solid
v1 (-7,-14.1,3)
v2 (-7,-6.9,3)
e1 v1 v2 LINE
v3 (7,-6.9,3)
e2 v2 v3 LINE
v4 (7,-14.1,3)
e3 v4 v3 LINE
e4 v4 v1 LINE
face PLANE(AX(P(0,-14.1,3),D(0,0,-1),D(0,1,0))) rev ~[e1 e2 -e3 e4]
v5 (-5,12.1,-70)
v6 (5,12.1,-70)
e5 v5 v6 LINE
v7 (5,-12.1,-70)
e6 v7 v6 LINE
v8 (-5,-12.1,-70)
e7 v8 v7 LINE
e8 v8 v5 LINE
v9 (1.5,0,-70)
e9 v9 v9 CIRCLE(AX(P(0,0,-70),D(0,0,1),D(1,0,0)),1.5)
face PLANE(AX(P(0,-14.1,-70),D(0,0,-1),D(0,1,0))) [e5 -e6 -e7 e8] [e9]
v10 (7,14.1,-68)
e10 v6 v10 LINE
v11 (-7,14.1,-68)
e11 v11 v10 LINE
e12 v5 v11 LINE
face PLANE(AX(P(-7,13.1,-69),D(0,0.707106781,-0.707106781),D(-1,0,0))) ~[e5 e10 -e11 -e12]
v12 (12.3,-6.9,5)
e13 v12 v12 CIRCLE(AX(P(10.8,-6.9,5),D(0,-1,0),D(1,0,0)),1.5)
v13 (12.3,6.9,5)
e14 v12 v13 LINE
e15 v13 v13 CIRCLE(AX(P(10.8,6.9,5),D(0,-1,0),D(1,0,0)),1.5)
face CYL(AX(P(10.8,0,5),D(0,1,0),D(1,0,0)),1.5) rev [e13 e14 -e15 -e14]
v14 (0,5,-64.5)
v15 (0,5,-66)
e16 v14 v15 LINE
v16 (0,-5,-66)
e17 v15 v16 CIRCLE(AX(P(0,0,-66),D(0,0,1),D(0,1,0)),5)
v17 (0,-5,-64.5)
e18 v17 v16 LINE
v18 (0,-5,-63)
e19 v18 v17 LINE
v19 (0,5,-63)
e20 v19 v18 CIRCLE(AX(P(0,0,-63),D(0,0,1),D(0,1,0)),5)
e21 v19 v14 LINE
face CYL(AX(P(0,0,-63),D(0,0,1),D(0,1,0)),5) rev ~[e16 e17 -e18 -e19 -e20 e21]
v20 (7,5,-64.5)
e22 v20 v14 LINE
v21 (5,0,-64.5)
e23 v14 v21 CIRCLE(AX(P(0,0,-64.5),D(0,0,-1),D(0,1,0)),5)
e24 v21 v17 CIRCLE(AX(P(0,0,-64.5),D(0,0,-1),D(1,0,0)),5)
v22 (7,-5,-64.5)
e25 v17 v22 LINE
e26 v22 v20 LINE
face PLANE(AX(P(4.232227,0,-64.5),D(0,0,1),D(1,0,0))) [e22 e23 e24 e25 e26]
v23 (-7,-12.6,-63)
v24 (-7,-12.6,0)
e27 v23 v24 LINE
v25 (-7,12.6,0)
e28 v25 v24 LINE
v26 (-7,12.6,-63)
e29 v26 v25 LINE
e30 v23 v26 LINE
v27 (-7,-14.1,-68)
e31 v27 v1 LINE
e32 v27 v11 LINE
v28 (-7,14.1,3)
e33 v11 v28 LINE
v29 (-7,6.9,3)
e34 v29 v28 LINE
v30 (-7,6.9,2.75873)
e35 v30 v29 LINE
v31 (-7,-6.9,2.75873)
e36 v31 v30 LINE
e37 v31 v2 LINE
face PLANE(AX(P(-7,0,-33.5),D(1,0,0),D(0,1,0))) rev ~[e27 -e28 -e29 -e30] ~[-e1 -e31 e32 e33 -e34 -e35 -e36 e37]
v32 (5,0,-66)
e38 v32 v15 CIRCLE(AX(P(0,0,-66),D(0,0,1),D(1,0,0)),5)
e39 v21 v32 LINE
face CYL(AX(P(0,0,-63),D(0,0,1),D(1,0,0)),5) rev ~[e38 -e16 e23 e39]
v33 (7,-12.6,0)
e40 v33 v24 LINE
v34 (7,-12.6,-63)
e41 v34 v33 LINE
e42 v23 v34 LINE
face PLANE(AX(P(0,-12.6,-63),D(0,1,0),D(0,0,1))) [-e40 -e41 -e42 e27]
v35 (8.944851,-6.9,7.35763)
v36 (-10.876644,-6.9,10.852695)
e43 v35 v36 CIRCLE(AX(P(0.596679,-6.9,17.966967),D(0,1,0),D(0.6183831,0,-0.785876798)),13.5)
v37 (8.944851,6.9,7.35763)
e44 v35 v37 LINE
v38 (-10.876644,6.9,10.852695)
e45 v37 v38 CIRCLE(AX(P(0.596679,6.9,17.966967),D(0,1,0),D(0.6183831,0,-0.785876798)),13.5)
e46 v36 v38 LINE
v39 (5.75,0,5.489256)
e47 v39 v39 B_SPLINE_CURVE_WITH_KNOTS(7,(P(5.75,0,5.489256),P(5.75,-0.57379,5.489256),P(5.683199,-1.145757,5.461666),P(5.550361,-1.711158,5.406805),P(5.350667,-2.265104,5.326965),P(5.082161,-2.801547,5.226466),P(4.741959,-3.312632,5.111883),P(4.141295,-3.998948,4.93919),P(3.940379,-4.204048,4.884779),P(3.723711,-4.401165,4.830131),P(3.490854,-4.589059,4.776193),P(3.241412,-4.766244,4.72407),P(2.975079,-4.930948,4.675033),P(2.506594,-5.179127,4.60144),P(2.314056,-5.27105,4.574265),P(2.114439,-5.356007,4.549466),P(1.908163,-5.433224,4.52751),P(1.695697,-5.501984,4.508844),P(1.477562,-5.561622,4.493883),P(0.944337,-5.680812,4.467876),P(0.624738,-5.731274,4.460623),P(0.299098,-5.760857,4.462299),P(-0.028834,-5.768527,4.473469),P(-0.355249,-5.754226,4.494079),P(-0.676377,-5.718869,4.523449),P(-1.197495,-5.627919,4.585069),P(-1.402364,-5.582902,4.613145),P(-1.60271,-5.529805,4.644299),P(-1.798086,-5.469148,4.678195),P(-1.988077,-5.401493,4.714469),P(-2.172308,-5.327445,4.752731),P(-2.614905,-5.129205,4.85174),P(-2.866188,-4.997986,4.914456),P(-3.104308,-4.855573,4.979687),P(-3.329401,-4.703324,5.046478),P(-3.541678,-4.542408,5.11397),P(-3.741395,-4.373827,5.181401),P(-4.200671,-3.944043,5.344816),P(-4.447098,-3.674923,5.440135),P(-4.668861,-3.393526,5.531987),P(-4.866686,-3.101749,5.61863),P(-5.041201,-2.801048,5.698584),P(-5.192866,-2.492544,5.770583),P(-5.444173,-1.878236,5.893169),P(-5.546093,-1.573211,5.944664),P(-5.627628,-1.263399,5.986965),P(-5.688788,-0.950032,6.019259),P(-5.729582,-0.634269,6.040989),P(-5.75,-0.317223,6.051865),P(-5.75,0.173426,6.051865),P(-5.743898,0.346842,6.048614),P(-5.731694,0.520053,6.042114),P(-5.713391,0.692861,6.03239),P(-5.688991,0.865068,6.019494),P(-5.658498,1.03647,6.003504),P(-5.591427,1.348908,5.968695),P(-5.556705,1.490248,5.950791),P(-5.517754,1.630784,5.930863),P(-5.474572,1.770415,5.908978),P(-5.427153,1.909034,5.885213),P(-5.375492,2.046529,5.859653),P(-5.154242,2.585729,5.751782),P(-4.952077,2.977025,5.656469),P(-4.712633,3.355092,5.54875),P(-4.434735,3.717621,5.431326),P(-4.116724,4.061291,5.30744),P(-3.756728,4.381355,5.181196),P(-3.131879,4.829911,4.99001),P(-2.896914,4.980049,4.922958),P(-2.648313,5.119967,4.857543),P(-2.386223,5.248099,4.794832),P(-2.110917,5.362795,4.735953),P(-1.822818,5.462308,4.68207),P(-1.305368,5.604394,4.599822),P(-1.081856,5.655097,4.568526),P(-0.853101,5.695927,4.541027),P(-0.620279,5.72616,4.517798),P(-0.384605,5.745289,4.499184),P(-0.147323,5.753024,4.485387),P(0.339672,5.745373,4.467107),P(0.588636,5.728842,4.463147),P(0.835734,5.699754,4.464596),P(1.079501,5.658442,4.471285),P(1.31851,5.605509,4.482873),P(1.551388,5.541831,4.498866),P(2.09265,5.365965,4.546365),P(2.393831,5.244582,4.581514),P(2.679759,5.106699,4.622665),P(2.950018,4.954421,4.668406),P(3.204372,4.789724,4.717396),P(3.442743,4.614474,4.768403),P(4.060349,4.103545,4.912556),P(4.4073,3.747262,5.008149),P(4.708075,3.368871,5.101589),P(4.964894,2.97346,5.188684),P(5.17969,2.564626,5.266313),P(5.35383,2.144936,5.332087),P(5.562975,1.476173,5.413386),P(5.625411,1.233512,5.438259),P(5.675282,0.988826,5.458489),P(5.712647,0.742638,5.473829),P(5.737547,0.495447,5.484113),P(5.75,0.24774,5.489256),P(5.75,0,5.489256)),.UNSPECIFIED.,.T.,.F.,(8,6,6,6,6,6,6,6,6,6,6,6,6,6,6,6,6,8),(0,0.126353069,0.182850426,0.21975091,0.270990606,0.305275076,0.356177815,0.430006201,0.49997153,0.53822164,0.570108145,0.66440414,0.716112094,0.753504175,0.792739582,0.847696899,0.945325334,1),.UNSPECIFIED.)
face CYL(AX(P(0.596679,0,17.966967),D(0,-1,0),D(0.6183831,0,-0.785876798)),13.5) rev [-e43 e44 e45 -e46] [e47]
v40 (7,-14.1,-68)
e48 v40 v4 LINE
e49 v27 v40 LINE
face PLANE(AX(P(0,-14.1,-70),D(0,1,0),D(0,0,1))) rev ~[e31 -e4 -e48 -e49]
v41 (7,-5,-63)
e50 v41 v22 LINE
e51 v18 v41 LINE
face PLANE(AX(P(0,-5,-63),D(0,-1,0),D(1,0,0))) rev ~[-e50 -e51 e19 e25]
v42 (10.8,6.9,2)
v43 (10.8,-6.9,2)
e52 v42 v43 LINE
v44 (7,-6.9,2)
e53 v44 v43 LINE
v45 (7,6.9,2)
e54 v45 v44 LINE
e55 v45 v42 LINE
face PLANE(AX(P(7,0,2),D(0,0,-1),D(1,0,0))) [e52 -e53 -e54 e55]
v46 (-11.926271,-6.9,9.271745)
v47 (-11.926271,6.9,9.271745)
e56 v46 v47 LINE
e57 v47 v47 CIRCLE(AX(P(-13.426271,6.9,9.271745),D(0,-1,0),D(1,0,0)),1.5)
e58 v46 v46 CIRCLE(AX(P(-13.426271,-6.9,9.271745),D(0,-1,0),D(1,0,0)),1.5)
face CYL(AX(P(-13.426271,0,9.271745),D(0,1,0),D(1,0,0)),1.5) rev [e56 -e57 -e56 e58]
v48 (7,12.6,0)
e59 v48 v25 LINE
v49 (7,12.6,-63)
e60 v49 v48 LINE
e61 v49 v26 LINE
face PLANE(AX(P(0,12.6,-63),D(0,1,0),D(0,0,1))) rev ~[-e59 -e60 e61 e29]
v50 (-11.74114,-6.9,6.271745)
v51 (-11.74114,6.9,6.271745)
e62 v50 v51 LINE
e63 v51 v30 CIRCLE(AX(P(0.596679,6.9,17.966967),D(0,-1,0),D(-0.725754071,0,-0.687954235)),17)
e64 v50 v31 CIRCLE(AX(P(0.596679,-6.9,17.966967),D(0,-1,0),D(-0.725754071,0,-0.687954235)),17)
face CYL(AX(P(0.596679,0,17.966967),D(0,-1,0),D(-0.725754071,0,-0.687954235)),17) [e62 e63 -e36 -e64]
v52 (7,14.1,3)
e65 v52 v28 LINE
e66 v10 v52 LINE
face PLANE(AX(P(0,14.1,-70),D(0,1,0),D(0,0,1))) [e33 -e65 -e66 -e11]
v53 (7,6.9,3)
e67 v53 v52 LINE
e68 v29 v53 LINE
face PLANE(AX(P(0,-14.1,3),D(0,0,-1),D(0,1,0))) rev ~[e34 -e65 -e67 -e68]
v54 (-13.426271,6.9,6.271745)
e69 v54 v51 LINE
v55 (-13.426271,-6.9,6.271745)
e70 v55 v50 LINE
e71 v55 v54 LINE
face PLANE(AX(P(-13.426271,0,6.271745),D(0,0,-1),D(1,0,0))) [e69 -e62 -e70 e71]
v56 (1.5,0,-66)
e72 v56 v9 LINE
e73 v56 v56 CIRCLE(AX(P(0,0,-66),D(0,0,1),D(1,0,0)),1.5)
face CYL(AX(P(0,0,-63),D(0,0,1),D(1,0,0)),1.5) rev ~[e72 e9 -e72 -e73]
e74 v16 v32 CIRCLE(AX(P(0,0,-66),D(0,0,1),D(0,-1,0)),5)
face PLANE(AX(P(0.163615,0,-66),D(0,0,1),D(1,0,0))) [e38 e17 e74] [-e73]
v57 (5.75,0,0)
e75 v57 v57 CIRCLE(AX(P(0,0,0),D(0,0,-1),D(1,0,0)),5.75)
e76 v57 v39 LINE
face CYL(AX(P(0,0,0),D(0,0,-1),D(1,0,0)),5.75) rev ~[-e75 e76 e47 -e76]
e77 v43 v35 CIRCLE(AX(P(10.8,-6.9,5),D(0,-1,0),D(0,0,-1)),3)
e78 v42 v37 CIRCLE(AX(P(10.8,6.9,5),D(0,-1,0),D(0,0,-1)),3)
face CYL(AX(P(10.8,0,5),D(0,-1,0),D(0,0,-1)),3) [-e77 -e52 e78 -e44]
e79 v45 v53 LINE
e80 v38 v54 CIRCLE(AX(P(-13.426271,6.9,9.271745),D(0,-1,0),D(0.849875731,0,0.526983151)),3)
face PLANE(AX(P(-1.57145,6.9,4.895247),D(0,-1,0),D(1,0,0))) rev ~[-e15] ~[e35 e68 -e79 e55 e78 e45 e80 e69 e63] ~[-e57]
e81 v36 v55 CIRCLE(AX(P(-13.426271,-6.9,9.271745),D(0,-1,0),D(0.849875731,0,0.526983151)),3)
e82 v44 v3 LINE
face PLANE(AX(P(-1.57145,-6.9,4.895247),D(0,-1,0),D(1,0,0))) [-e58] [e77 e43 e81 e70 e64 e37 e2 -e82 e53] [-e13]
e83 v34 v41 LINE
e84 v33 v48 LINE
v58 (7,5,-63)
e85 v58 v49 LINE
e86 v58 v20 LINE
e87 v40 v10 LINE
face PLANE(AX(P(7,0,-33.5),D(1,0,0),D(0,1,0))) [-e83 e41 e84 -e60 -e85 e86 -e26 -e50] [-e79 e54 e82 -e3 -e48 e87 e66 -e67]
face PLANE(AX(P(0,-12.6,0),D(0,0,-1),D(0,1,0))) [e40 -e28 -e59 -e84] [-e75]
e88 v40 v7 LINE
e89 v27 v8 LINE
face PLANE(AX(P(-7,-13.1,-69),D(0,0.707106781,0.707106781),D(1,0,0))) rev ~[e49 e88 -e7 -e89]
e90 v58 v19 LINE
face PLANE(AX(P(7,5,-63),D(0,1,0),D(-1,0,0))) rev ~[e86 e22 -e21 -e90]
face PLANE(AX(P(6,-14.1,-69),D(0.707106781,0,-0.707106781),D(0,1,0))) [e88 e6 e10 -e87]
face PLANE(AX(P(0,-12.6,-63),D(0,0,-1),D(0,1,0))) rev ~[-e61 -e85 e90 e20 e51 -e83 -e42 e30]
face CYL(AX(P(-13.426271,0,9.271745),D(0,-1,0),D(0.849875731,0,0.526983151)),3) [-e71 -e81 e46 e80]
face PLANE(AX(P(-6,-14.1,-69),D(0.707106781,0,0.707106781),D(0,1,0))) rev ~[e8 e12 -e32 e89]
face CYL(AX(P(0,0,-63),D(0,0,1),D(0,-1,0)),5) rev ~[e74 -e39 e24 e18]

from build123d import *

# Parameters (mm, degrees)
F0_R      = 1.5
F1_DEPTH  = 6.9
F2_W      = 28.2
F2_H      = 73
F2_W_2    = 25.2
F2_H_2    = 63
F3_DEPTH  = 7
F4_R      = 5.75
F5_DEPTH  = 12.2727451706
F6_SIZE   = 2
F7_R      = 1.5
F8_DEPTH  = 3
F9_DEPTH  = 7.001
F10_DEPTH = 1.5


with BuildPart() as f1:
    # F0 (on Front) → F1 (new body, symmetric)
    with BuildSketch(Plane.XZ):
        with BuildLine():
            Line((-7, 2.7587302293), (-7, 0))
            Line((-7, 0), (7, 0))
            Line((7, 0), (7, 2))
            Line((7, 2), (10.8, 2))
            ThreePointArc((10.8, 2), (13.6348625345, 5.9816080739), (8.9448506986, 7.3576303929))
            ThreePointArc((8.9448506986, 7.3576303929), (-1.7475715563, 4.6720624952), (-10.8766435302, 10.8526946234))
            ThreePointArc((-10.8766435302, 10.8526946234), (-16.0476108736, 10.7307091252), (-13.4262707241, 6.2717451706))
            Line((-13.4262707241, 6.2717451706), (-11.7411403572, 6.2717451706))
            ThreePointArc((-11.7411403572, 6.2717451706), (-9.5241596378, 4.3079544417), (-7, 2.7587302293))
        make_face()
        with Locations((10.8, 5)):
            Circle(F0_R, mode=Mode.SUBTRACT)
        with Locations((-13.4262707241, 9.2717451706)):
            Circle(F0_R, mode=Mode.SUBTRACT)
    extrude(amount=F1_DEPTH, both=True)

    # F2 (on Right) → F3 (join, symmetric)
    with BuildSketch(Plane.YZ):
        with Locations((0, -33.5)):
            Rectangle(F2_W, F2_H)
        with Locations((0, -31.5)):
            Rectangle(F2_W_2, F2_H_2, mode=Mode.SUBTRACT)
    extrude(amount=F3_DEPTH, both=True)

    # F4 (on face) → F5 (cut, through all)
    with BuildSketch(Plane(origin=(0, 0, 0), x_dir=(1, 0, 0), z_dir=(0, 0, -1))):
        Circle(F4_R)
    extrude(amount=-F5_DEPTH, mode=Mode.SUBTRACT)

    # F6
    f6_edges = [f1.edges().sort_by_distance(p)[0] for p in [
        (0, -14.1, -70),
        (-7, 0, -70),
        (0, 14.1, -70),
        (7, 0, -70),
    ]]
    chamfer(f6_edges, length=F6_SIZE)

    # F7 (on face) → F8 (cut)
    with BuildSketch(Plane.XY.offset(-63)):
        with BuildLine():
            ThreePointArc((0, -5), (3.5355339059, -3.5355339059), (5, 0))
            ThreePointArc((5, 0), (3.5355339059, 3.5355339059), (0, 5))
            ThreePointArc((0, 5), (-5, 0), (0, -5))
        make_face()
        Circle(F7_R, mode=Mode.SUBTRACT)
    extrude(amount=-F8_DEPTH, mode=Mode.SUBTRACT)

    # F9 (cut, through all): a face of the model
    f9_faces = [f1.faces().sort_by_distance(p)[0] for p in [
        (0, 0, -63),
    ]]
    extrude(f9_faces, amount=-F9_DEPTH, mode=Mode.SUBTRACT)

    # F7 (on face) → F10 (cut)
    with BuildSketch(Plane.XY.offset(-63)):
        with BuildLine():
            ThreePointArc((0, 5), (3.5355339059, 3.5355339059), (5, 0))
            ThreePointArc((5, 0), (3.5355339059, -3.5355339059), (0, -5))
            Line((0, -5), (7, -5))
            Line((7, -5), (7, 5))
            Line((7, 5), (0, 5))
        make_face()
    extrude(amount=-F10_DEPTH, mode=Mode.SUBTRACT)


solid = f1.part
